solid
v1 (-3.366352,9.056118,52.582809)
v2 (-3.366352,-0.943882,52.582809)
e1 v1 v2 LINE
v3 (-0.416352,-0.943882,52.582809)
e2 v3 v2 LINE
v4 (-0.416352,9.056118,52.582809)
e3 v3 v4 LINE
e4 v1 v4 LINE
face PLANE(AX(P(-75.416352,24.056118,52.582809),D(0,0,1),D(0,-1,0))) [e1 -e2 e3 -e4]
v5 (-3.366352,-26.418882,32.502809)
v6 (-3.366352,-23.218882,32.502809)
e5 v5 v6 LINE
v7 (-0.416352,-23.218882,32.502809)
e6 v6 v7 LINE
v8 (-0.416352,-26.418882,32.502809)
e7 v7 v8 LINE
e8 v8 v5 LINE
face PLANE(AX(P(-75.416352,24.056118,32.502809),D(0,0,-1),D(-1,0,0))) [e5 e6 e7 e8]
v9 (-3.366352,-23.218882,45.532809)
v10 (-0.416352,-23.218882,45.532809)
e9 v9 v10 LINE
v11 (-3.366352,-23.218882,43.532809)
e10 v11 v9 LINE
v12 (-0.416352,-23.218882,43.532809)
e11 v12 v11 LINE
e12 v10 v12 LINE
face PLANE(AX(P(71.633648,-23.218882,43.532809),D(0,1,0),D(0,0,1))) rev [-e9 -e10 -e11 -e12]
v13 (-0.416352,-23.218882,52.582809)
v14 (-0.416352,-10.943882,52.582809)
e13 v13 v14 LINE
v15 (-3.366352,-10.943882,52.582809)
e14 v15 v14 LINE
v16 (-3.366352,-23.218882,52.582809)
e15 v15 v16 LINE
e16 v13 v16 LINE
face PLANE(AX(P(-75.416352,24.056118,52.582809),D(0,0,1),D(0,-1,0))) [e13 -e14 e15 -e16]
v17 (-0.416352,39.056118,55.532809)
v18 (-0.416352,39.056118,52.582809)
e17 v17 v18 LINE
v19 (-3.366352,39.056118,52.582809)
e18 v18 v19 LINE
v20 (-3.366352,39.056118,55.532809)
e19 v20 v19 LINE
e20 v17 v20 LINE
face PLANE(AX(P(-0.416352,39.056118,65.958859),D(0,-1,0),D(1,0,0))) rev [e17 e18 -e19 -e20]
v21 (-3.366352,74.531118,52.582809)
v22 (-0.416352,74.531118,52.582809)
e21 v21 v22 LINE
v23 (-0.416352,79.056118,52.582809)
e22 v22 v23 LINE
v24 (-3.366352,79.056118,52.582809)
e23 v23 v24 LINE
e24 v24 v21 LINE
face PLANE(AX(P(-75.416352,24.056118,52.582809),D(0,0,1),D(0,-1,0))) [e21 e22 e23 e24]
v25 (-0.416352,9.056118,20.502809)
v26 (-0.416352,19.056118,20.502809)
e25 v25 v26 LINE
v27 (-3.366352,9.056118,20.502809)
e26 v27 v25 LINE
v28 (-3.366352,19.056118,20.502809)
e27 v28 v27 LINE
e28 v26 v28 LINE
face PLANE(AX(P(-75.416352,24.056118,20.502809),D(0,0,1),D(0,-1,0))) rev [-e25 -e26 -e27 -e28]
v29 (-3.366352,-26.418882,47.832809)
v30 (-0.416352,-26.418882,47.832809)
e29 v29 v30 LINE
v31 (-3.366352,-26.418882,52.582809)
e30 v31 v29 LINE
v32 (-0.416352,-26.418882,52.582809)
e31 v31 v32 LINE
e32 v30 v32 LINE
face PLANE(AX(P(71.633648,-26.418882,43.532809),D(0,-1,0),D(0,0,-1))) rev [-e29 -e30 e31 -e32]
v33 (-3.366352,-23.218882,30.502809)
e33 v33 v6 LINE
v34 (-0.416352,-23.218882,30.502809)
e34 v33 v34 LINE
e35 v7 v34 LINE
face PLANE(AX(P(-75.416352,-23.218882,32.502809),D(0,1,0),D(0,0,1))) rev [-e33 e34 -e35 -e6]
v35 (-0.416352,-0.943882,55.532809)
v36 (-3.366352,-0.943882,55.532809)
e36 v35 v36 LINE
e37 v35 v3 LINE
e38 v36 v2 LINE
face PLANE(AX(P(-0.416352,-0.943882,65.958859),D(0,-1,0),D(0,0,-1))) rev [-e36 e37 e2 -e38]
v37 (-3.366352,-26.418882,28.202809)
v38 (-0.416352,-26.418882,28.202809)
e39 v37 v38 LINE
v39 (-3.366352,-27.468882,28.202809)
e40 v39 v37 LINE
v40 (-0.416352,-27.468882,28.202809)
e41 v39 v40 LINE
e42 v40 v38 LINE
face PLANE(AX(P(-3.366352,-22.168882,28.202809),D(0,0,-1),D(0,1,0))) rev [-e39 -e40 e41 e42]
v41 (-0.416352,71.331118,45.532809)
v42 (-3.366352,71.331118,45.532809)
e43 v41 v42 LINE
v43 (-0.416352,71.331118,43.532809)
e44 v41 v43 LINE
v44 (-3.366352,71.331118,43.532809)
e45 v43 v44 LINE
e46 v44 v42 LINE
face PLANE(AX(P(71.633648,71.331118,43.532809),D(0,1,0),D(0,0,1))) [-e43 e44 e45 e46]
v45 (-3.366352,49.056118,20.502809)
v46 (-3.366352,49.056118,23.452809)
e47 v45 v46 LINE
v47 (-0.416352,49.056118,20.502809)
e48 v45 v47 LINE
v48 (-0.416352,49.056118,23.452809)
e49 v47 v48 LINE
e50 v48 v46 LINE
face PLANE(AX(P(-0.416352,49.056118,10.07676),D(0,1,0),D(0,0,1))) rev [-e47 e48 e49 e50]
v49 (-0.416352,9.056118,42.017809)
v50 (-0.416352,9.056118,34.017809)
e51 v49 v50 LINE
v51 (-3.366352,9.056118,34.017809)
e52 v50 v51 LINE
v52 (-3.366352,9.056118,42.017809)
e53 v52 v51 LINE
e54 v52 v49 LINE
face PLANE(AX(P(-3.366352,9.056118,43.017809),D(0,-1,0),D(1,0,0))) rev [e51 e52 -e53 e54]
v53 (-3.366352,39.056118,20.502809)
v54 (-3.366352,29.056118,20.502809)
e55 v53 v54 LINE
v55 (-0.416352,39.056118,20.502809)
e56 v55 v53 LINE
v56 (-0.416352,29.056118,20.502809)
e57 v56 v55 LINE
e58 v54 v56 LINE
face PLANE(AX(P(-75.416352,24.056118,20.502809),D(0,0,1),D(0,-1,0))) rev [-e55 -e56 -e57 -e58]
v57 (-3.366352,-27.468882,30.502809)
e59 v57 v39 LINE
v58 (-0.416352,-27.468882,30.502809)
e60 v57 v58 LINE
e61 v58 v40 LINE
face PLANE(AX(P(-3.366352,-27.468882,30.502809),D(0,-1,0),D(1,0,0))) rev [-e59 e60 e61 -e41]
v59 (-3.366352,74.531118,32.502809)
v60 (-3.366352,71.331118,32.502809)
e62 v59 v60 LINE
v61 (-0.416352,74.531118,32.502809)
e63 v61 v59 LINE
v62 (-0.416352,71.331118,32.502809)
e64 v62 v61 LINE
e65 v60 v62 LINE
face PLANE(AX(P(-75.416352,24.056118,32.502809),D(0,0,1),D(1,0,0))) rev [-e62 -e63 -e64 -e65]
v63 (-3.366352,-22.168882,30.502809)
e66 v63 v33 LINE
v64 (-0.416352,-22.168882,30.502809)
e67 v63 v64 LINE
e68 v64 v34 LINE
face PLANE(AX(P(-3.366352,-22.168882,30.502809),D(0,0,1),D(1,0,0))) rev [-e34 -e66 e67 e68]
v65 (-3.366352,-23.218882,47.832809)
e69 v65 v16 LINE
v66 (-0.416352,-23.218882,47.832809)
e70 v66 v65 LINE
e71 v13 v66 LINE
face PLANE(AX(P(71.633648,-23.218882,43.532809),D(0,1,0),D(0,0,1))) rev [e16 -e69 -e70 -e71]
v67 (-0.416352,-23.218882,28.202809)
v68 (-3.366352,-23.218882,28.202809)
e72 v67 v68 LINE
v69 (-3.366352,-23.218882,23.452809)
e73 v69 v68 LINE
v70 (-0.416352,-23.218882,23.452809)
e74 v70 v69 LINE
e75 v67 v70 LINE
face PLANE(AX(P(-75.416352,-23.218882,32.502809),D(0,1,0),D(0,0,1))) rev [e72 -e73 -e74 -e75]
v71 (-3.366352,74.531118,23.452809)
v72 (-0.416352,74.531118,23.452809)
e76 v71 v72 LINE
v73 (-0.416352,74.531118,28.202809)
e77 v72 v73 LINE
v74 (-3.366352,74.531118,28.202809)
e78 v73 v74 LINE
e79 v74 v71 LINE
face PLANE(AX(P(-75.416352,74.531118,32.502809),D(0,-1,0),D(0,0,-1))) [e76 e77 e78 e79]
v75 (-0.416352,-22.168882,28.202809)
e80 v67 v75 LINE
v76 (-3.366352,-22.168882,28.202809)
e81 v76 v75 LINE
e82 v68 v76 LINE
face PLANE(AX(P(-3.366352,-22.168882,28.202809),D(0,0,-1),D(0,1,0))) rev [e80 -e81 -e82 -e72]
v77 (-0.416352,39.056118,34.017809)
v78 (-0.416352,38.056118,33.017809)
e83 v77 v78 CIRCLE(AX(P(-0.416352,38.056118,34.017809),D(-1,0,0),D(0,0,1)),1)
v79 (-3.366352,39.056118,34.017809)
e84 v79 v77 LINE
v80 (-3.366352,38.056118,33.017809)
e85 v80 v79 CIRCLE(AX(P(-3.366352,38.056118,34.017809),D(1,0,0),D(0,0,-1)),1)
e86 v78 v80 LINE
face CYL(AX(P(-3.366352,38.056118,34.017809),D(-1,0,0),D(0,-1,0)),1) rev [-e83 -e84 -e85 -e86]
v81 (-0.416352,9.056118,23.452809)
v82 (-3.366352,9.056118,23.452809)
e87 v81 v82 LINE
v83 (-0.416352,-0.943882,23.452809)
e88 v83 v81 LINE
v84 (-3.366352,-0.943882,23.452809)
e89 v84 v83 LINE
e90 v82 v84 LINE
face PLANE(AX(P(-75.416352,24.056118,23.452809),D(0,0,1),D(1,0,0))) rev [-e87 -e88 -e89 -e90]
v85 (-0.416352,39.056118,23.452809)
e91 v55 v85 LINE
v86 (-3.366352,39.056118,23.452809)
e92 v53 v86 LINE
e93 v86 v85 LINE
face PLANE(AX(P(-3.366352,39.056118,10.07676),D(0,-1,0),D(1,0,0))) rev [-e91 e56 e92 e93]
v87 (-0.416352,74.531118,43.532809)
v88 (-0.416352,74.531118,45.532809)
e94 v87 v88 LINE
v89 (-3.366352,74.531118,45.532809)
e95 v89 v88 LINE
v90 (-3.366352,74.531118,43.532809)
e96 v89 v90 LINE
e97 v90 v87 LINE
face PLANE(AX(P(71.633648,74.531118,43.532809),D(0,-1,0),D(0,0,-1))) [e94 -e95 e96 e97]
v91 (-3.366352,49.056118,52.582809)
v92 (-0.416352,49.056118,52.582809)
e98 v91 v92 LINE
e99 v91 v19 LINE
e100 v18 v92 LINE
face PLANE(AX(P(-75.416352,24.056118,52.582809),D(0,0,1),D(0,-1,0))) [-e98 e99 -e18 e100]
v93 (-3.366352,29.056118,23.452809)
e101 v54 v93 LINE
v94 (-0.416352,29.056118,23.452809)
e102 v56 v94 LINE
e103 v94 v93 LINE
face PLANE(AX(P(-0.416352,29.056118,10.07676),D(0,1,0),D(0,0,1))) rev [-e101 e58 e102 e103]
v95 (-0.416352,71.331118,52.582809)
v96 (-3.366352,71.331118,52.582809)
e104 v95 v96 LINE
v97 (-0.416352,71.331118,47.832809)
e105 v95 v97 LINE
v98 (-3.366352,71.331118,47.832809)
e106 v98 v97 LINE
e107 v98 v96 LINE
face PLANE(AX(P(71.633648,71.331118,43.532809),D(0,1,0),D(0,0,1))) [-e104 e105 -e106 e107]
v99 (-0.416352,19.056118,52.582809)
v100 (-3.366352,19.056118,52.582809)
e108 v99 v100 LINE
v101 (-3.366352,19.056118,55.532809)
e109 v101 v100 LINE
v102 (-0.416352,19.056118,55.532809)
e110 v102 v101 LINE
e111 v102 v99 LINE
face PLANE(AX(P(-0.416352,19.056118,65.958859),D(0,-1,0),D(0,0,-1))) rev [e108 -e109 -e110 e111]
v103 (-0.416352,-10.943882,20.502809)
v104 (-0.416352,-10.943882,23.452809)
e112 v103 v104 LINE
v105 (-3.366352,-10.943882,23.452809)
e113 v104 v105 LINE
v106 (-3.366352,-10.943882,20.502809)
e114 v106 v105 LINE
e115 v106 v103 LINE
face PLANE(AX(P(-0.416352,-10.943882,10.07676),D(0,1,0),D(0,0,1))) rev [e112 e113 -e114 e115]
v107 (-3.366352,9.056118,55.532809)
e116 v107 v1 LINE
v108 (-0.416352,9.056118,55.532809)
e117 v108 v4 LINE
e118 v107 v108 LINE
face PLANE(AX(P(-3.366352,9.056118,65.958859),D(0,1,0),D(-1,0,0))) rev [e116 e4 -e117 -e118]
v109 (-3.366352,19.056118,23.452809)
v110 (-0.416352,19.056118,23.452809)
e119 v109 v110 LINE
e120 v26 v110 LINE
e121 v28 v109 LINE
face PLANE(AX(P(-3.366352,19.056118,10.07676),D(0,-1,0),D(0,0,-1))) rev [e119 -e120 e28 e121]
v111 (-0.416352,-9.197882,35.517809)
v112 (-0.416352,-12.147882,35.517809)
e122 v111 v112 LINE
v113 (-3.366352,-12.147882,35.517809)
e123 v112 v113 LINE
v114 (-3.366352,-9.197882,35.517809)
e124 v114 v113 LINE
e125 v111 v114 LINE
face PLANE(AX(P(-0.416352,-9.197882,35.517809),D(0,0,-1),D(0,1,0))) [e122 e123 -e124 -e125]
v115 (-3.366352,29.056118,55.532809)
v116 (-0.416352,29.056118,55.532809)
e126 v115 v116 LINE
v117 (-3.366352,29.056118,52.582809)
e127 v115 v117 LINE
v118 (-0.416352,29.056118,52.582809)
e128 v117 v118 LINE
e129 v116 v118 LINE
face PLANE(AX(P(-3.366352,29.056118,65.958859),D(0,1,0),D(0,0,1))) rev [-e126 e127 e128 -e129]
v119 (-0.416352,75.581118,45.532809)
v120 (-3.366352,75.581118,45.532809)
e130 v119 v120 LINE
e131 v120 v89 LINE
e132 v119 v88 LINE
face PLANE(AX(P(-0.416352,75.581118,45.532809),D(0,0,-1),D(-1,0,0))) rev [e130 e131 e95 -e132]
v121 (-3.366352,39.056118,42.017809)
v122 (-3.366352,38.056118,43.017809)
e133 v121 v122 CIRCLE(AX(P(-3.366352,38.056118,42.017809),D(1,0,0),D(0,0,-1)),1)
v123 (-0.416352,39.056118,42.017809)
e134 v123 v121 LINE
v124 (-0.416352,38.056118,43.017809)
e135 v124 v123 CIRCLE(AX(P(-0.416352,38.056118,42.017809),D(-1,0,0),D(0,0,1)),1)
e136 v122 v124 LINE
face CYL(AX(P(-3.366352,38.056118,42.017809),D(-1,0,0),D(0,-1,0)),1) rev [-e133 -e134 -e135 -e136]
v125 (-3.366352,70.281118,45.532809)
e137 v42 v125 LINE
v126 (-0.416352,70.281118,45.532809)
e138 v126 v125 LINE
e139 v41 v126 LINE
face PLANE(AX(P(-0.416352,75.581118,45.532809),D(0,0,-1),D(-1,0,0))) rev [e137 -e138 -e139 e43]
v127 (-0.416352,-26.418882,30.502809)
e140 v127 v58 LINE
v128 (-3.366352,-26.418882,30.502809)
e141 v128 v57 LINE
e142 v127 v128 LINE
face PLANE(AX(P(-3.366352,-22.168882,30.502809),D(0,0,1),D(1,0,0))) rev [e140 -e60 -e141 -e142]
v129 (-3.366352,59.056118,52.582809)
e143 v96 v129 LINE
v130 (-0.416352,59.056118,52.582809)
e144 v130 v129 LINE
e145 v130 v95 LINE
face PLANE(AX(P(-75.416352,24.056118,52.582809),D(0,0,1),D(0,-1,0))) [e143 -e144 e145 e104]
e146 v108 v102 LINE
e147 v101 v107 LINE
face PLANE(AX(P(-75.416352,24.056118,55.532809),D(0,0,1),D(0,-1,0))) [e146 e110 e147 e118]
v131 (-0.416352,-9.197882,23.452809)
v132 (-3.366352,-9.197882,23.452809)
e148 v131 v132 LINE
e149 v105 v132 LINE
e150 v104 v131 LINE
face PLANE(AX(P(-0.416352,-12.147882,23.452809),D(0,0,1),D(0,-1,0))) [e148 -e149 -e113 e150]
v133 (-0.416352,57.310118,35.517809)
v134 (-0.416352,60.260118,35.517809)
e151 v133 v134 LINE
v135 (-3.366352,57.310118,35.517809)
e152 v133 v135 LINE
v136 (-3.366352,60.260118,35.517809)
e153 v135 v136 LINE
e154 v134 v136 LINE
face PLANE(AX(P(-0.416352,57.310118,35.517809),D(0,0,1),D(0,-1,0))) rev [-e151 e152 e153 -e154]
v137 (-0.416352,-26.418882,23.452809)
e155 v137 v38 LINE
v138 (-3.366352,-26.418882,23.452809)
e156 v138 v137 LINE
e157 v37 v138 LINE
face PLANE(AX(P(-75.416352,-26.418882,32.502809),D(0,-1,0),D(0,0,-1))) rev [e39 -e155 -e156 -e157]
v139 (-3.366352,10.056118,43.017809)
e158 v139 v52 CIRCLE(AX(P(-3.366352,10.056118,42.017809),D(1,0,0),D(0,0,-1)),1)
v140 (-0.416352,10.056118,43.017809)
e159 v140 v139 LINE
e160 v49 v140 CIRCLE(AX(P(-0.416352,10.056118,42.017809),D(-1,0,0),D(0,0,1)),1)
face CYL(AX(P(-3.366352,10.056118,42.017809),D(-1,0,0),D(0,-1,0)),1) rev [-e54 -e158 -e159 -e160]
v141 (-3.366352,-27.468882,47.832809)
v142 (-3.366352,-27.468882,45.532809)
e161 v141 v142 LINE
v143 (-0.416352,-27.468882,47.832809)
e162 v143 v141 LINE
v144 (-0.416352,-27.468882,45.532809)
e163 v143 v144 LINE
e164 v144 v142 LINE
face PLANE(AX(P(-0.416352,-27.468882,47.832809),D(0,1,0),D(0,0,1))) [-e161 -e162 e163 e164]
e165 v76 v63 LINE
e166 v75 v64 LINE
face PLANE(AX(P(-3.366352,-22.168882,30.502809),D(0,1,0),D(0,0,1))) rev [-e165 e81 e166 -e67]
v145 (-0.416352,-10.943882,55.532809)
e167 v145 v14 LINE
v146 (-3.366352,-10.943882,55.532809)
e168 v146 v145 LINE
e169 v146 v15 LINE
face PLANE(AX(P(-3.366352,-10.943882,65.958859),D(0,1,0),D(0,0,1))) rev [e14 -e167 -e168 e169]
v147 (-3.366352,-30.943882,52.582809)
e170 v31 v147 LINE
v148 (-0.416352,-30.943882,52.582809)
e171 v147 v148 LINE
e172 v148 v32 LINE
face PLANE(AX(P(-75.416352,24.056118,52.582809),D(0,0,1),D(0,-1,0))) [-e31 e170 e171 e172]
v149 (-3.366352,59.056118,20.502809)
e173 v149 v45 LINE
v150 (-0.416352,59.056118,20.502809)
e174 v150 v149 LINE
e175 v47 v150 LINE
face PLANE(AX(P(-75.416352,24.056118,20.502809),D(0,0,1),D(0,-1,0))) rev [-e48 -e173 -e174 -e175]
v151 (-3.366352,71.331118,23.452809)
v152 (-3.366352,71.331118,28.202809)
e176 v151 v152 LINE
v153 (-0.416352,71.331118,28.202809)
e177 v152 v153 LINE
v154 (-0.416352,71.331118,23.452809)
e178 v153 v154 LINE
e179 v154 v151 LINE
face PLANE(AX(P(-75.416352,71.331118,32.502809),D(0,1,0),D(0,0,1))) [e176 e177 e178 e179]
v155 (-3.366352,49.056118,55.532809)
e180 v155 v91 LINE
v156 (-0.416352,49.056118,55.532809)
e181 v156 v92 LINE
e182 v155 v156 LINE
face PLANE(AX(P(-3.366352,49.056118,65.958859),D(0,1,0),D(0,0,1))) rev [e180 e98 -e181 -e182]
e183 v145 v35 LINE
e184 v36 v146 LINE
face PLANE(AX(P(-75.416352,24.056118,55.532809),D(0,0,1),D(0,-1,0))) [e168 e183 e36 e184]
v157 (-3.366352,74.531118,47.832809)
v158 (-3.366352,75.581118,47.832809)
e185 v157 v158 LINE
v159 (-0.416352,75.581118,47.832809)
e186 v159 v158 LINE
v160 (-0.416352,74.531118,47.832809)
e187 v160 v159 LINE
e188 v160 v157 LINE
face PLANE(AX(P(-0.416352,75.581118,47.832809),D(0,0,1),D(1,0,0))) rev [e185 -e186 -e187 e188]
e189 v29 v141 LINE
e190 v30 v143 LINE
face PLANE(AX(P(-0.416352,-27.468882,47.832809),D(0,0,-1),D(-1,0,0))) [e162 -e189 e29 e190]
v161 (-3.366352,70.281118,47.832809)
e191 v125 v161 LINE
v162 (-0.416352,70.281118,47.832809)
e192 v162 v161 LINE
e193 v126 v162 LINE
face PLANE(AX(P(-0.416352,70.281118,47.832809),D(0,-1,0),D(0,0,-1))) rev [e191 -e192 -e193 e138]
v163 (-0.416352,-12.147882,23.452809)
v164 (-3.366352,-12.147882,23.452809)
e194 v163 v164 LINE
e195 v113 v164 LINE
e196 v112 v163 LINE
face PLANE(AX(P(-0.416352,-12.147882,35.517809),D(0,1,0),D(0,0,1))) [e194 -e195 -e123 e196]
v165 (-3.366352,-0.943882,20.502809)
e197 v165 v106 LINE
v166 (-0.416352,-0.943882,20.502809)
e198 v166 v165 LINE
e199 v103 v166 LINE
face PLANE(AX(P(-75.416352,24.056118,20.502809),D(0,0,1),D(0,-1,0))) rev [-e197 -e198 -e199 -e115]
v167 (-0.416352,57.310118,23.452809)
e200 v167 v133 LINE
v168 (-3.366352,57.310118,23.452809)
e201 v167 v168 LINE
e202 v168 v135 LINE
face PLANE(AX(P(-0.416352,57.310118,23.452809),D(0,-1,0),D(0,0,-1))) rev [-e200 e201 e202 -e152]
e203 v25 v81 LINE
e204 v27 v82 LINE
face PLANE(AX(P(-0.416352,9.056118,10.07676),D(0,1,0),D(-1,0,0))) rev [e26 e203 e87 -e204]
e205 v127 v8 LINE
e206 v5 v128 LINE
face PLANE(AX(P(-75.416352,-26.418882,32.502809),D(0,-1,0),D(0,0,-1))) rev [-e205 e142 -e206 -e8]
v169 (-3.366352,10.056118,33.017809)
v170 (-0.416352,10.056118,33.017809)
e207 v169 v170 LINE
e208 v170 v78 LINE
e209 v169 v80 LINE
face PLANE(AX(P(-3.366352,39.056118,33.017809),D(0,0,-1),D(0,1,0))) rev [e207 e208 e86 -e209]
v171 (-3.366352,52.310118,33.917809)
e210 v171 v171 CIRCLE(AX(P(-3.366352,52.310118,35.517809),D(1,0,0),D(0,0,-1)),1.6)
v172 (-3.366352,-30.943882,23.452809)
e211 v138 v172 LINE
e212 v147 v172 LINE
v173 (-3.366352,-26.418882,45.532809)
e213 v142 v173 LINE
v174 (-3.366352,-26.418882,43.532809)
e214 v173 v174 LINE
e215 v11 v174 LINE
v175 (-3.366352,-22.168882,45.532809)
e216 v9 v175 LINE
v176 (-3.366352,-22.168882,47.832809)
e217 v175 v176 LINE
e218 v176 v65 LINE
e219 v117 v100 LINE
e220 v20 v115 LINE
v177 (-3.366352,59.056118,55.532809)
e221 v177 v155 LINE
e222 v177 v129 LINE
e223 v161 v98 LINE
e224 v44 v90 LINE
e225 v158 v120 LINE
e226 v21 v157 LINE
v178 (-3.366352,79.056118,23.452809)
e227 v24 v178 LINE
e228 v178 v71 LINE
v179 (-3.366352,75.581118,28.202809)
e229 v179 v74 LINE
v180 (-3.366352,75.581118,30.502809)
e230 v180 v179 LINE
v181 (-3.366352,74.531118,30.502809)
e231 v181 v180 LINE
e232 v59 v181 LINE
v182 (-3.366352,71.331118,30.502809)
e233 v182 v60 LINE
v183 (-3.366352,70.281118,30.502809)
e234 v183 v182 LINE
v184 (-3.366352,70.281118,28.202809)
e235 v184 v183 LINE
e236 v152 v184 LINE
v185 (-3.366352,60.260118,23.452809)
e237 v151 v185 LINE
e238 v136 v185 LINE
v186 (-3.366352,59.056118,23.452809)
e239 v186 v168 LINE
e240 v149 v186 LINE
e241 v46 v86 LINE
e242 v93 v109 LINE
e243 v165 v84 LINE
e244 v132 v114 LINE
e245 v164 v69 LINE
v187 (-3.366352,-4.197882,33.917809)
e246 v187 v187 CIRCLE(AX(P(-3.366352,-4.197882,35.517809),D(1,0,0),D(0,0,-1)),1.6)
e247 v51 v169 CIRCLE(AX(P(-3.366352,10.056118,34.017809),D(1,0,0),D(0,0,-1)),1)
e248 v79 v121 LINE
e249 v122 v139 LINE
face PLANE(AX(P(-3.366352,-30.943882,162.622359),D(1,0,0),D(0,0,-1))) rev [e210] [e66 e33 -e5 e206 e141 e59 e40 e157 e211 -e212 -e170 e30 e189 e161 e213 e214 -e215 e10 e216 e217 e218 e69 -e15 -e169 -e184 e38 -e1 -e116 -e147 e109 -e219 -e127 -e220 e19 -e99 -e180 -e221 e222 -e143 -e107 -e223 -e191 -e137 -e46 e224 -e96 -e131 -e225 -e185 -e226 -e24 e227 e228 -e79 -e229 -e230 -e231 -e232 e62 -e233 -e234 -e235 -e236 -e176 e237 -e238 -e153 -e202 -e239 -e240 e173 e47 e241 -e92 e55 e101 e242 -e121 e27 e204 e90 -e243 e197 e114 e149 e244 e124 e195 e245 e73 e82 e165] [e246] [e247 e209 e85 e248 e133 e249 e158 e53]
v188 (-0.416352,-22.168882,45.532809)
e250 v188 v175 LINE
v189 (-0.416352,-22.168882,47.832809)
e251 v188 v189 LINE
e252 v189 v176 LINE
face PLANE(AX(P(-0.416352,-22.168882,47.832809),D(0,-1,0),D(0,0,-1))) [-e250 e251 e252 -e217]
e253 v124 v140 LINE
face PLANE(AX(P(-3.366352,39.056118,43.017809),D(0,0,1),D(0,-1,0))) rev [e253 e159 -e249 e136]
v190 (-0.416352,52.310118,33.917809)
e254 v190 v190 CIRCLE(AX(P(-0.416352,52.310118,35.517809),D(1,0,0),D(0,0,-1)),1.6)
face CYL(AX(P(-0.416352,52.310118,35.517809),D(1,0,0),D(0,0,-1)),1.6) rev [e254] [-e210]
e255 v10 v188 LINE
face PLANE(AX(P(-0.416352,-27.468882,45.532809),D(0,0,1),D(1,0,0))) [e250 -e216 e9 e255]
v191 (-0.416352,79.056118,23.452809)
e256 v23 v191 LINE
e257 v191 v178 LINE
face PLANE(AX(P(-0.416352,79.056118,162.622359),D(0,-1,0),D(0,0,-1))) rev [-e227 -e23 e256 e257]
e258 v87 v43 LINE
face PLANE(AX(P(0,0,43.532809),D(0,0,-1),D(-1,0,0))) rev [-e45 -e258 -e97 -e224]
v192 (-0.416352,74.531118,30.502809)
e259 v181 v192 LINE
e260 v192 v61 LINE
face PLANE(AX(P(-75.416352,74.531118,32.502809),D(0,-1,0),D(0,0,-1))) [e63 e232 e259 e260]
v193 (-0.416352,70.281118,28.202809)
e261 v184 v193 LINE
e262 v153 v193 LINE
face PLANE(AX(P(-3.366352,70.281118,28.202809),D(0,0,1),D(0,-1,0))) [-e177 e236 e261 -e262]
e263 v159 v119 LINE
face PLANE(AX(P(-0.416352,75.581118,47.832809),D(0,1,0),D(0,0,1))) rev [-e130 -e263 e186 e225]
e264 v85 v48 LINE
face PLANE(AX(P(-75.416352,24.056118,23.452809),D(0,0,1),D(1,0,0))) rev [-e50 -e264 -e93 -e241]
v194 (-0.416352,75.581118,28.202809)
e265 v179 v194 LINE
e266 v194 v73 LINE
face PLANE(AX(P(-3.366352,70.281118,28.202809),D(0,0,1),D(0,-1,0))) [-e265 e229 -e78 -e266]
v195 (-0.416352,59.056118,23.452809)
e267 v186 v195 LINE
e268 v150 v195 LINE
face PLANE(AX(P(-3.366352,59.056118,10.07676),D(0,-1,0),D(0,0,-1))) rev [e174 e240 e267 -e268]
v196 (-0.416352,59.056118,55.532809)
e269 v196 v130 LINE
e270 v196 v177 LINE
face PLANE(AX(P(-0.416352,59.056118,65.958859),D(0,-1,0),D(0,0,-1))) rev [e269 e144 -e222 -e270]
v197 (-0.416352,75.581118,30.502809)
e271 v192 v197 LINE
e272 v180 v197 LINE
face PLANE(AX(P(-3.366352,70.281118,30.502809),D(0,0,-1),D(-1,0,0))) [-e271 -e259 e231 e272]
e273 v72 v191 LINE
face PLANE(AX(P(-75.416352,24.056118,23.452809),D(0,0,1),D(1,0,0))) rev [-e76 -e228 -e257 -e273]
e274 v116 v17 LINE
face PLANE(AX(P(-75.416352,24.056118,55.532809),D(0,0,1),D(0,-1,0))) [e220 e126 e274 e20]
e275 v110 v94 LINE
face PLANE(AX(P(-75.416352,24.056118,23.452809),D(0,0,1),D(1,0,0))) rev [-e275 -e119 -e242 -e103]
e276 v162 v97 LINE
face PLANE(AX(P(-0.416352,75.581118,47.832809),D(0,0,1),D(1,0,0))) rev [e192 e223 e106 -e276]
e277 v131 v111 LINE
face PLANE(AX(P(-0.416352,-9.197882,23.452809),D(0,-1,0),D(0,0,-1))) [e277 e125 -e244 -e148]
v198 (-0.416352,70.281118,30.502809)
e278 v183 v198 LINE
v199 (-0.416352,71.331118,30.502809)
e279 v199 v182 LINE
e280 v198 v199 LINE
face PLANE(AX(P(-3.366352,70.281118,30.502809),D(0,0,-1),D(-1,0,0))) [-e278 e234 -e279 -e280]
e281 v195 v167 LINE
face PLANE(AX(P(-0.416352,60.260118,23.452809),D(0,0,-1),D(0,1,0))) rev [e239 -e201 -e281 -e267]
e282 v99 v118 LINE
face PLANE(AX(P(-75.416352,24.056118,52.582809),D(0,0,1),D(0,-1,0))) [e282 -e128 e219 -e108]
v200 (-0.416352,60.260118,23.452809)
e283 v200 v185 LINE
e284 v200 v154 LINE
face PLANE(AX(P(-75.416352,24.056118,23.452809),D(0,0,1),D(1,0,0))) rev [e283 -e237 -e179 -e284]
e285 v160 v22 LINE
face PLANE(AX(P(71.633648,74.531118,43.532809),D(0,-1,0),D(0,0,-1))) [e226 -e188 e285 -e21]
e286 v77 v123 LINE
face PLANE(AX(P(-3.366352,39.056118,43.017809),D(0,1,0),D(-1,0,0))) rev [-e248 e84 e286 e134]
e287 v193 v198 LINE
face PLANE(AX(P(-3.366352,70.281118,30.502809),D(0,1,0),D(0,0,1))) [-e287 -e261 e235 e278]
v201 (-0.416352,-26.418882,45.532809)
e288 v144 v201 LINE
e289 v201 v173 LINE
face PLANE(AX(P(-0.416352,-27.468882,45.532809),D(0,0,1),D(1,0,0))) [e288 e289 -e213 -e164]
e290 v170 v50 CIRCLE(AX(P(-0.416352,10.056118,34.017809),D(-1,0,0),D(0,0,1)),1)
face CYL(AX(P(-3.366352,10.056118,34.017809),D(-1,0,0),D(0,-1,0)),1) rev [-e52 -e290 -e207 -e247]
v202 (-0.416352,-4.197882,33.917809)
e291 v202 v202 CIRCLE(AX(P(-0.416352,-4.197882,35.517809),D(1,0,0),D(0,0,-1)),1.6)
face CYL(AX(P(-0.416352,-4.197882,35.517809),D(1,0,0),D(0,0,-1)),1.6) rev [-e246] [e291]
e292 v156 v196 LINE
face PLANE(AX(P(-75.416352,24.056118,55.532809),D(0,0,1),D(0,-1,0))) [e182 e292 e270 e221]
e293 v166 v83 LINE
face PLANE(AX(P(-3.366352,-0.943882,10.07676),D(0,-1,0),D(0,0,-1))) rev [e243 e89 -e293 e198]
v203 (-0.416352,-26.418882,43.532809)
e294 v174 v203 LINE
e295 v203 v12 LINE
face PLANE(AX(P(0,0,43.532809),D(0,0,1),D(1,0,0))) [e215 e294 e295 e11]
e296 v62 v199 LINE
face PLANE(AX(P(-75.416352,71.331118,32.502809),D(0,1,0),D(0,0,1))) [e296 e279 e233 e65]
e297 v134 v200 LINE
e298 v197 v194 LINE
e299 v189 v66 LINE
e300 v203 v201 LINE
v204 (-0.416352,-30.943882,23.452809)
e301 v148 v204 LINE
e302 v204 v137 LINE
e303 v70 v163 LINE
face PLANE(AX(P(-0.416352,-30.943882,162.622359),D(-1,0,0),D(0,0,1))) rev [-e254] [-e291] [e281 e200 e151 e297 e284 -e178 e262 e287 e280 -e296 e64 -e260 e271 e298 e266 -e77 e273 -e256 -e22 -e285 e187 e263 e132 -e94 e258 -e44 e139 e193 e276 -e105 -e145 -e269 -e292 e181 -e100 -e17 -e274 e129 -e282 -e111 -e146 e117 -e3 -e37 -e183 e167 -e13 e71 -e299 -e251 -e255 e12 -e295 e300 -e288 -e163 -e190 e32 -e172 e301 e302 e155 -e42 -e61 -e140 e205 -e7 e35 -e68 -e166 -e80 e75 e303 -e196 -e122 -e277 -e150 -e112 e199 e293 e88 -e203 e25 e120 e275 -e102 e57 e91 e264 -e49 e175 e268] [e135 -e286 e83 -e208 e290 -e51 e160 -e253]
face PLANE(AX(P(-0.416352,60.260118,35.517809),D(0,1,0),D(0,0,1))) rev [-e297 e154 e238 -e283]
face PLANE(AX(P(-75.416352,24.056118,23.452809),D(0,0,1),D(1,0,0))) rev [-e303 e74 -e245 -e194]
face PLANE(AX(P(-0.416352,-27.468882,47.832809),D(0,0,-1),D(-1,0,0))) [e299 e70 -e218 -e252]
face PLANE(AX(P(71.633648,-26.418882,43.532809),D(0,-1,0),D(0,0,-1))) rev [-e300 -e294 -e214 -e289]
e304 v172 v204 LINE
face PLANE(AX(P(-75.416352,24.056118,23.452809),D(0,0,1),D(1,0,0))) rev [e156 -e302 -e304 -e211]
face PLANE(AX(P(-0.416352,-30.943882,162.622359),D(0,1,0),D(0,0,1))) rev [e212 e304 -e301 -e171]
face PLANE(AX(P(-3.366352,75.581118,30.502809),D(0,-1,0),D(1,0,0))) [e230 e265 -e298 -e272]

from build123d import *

# Parameters (mm, degrees)
FRONT_START          = -3.366352234
FRONT_PLATE_DEPTH    = 2.95
CUT_EXTRUDE1_START   = 2.95
SKETCH1_W            = 3.2
SKETCH1_H            = 3.2
CUT_EXTRUDE1_DEPTH   = 12
SKETCH2_W            = 2.3
SKETCH2_H            = 5.3
CUT_EXTRUDE2_DEPTH   = 97.656428996
M3_CLEARANCE_HOLE1_D = 3.2
SKETCH5_W            = 10
SKETCH5_H            = 30
CUT_EXTRUDE3_DEPTH   = 97.656428996
FILLET1_R            = 1


# Read off the part's stored shape, not the designer's step: Front Plate
with BuildPart() as part:
    # Front Plate outline → Front Plate (new body)
    with BuildSketch(Plane.YZ.offset(FRONT_START)):
        Polygon((-23.21888173, 23.452809495), (-12.14788173, 23.452809495), (-12.14788173, 35.517809495), (-9.19788173, 35.517809495), (-9.19788173, 23.452809495), (-10.94388173, 23.452809495), (-10.94388173, 20.502809495), (-0.94388173, 20.502809495), (-0.94388173, 23.452809495), (9.05611827, 23.452809495), (9.05611827, 20.502809495), (19.05611827, 20.502809495), (19.05611827, 23.452809495), (29.05611827, 23.452809495), (29.05611827, 20.502809495), (39.05611827, 20.502809495), (39.05611827, 23.452809495), (49.05611827, 23.452809495), (49.05611827, 20.502809495), (59.05611827, 20.502809495), (59.05611827, 23.452809495), (57.31011827, 23.452809495), (57.31011827, 35.517809495), (60.26011827, 35.517809495), (60.26011827, 23.452809495), (71.33111827, 23.452809495), (71.33111827, 28.202809495), (70.28111827, 28.202809495), (70.28111827, 30.502809495), (71.33111827, 30.502809495), (71.33111827, 32.502809495), (74.53111827, 32.502809495), (74.53111827, 30.502809495), (75.58111827, 30.502809495), (75.58111827, 28.202809495), (74.53111827, 28.202809495), (74.53111827, 23.452809495), (79.05611827, 23.452809495), (79.05611827, 52.582809495), (59.05611827, 52.582809495), (59.05611827, 55.532809495), (49.05611827, 55.532809495), (49.05611827, 52.582809495), (39.05611827, 52.582809495), (39.05611827, 55.532809495), (29.05611827, 55.532809495), (29.05611827, 52.582809495), (19.05611827, 52.582809495), (19.05611827, 55.532809495), (9.05611827, 55.532809495), (9.05611827, 52.582809495), (-0.94388173, 52.582809495), (-0.94388173, 55.532809495), (-10.94388173, 55.532809495), (-10.94388173, 52.582809495), (-30.94388173, 52.582809495), (-30.94388173, 23.452809495), (-26.41888173, 23.452809495), (-26.41888173, 28.202809495), (-27.46888173, 28.202809495), (-27.46888173, 30.502809495), (-26.41888173, 30.502809495), (-26.41888173, 32.502809495), (-23.21888173, 32.502809495), (-23.21888173, 30.502809495), (-22.16888173, 30.502809495), (-22.16888173, 28.202809495), (-23.21888173, 28.202809495), align=None)
    extrude(amount=FRONT_PLATE_DEPTH)

    # Sketch1 → Cut-Extrude1 (cut)
    with BuildSketch(Plane.XY.offset(52.582809495).offset(CUT_EXTRUDE1_START)):
        with Locations((-1.891352234, 72.93111827)):
            Rectangle(SKETCH1_W, SKETCH1_H)
    cut_extrude1 = extrude(amount=-CUT_EXTRUDE1_DEPTH, mode=Mode.SUBTRACT)

    # Sketch2 → Cut-Extrude2 (cut, through all)
    with BuildSketch(Plane.ZY.offset(3.366352234)):
        with Locations((46.682809496, 72.93111827)):
            Rectangle(SKETCH2_W, SKETCH2_H)
    cut_extrude2 = extrude(amount=-CUT_EXTRUDE2_DEPTH, mode=Mode.SUBTRACT)

    # M3 Clearance Hole1 (through all)
    with Locations(Plane(origin=(-0.416352234, 0, 0), x_dir=(0, 0, -1), z_dir=(1, 0, 0))):
        with Locations((-35.517809495, 52.31011827)):
            m3_clearance_hole1 = Hole(M3_CLEARANCE_HOLE1_D / 2)

    # Mirror1: Cut-Extrude1, Cut-Extrude2, M3 Clearance Hole1 across plane
    add(cut_extrude1.mirror(Plane.ZX.offset(24.05611827)), mode=Mode.SUBTRACT)
    add(cut_extrude2.mirror(Plane.ZX.offset(24.05611827)), mode=Mode.SUBTRACT)
    add(m3_clearance_hole1.mirror(Plane.ZX.offset(24.05611827)), mode=Mode.SUBTRACT)

    # Sketch5 → Cut-Extrude3 (cut, through all)
    with BuildSketch(Plane(origin=(-0.416352234, 0, 0), x_dir=(0, 0, -1), z_dir=(1, 0, 0))):
        with Locations((-38.017809495, 24.05611827)):
            Rectangle(SKETCH5_W, SKETCH5_H)
    extrude(amount=-CUT_EXTRUDE3_DEPTH, mode=Mode.SUBTRACT)

    # Fillet1
    fillet1_edges = [part.edges().sort_by_distance(p)[0] for p in [
        (-1.891352234, 39.05611827, 33.017809495),
        (-1.891352234, 9.05611827, 33.017809495),
        (-1.891352234, 9.05611827, 43.017809495),
        (-1.891352234, 39.05611827, 43.017809495),
    ]]
    fillet(fillet1_edges, radius=FILLET1_R)


solid = part.part
